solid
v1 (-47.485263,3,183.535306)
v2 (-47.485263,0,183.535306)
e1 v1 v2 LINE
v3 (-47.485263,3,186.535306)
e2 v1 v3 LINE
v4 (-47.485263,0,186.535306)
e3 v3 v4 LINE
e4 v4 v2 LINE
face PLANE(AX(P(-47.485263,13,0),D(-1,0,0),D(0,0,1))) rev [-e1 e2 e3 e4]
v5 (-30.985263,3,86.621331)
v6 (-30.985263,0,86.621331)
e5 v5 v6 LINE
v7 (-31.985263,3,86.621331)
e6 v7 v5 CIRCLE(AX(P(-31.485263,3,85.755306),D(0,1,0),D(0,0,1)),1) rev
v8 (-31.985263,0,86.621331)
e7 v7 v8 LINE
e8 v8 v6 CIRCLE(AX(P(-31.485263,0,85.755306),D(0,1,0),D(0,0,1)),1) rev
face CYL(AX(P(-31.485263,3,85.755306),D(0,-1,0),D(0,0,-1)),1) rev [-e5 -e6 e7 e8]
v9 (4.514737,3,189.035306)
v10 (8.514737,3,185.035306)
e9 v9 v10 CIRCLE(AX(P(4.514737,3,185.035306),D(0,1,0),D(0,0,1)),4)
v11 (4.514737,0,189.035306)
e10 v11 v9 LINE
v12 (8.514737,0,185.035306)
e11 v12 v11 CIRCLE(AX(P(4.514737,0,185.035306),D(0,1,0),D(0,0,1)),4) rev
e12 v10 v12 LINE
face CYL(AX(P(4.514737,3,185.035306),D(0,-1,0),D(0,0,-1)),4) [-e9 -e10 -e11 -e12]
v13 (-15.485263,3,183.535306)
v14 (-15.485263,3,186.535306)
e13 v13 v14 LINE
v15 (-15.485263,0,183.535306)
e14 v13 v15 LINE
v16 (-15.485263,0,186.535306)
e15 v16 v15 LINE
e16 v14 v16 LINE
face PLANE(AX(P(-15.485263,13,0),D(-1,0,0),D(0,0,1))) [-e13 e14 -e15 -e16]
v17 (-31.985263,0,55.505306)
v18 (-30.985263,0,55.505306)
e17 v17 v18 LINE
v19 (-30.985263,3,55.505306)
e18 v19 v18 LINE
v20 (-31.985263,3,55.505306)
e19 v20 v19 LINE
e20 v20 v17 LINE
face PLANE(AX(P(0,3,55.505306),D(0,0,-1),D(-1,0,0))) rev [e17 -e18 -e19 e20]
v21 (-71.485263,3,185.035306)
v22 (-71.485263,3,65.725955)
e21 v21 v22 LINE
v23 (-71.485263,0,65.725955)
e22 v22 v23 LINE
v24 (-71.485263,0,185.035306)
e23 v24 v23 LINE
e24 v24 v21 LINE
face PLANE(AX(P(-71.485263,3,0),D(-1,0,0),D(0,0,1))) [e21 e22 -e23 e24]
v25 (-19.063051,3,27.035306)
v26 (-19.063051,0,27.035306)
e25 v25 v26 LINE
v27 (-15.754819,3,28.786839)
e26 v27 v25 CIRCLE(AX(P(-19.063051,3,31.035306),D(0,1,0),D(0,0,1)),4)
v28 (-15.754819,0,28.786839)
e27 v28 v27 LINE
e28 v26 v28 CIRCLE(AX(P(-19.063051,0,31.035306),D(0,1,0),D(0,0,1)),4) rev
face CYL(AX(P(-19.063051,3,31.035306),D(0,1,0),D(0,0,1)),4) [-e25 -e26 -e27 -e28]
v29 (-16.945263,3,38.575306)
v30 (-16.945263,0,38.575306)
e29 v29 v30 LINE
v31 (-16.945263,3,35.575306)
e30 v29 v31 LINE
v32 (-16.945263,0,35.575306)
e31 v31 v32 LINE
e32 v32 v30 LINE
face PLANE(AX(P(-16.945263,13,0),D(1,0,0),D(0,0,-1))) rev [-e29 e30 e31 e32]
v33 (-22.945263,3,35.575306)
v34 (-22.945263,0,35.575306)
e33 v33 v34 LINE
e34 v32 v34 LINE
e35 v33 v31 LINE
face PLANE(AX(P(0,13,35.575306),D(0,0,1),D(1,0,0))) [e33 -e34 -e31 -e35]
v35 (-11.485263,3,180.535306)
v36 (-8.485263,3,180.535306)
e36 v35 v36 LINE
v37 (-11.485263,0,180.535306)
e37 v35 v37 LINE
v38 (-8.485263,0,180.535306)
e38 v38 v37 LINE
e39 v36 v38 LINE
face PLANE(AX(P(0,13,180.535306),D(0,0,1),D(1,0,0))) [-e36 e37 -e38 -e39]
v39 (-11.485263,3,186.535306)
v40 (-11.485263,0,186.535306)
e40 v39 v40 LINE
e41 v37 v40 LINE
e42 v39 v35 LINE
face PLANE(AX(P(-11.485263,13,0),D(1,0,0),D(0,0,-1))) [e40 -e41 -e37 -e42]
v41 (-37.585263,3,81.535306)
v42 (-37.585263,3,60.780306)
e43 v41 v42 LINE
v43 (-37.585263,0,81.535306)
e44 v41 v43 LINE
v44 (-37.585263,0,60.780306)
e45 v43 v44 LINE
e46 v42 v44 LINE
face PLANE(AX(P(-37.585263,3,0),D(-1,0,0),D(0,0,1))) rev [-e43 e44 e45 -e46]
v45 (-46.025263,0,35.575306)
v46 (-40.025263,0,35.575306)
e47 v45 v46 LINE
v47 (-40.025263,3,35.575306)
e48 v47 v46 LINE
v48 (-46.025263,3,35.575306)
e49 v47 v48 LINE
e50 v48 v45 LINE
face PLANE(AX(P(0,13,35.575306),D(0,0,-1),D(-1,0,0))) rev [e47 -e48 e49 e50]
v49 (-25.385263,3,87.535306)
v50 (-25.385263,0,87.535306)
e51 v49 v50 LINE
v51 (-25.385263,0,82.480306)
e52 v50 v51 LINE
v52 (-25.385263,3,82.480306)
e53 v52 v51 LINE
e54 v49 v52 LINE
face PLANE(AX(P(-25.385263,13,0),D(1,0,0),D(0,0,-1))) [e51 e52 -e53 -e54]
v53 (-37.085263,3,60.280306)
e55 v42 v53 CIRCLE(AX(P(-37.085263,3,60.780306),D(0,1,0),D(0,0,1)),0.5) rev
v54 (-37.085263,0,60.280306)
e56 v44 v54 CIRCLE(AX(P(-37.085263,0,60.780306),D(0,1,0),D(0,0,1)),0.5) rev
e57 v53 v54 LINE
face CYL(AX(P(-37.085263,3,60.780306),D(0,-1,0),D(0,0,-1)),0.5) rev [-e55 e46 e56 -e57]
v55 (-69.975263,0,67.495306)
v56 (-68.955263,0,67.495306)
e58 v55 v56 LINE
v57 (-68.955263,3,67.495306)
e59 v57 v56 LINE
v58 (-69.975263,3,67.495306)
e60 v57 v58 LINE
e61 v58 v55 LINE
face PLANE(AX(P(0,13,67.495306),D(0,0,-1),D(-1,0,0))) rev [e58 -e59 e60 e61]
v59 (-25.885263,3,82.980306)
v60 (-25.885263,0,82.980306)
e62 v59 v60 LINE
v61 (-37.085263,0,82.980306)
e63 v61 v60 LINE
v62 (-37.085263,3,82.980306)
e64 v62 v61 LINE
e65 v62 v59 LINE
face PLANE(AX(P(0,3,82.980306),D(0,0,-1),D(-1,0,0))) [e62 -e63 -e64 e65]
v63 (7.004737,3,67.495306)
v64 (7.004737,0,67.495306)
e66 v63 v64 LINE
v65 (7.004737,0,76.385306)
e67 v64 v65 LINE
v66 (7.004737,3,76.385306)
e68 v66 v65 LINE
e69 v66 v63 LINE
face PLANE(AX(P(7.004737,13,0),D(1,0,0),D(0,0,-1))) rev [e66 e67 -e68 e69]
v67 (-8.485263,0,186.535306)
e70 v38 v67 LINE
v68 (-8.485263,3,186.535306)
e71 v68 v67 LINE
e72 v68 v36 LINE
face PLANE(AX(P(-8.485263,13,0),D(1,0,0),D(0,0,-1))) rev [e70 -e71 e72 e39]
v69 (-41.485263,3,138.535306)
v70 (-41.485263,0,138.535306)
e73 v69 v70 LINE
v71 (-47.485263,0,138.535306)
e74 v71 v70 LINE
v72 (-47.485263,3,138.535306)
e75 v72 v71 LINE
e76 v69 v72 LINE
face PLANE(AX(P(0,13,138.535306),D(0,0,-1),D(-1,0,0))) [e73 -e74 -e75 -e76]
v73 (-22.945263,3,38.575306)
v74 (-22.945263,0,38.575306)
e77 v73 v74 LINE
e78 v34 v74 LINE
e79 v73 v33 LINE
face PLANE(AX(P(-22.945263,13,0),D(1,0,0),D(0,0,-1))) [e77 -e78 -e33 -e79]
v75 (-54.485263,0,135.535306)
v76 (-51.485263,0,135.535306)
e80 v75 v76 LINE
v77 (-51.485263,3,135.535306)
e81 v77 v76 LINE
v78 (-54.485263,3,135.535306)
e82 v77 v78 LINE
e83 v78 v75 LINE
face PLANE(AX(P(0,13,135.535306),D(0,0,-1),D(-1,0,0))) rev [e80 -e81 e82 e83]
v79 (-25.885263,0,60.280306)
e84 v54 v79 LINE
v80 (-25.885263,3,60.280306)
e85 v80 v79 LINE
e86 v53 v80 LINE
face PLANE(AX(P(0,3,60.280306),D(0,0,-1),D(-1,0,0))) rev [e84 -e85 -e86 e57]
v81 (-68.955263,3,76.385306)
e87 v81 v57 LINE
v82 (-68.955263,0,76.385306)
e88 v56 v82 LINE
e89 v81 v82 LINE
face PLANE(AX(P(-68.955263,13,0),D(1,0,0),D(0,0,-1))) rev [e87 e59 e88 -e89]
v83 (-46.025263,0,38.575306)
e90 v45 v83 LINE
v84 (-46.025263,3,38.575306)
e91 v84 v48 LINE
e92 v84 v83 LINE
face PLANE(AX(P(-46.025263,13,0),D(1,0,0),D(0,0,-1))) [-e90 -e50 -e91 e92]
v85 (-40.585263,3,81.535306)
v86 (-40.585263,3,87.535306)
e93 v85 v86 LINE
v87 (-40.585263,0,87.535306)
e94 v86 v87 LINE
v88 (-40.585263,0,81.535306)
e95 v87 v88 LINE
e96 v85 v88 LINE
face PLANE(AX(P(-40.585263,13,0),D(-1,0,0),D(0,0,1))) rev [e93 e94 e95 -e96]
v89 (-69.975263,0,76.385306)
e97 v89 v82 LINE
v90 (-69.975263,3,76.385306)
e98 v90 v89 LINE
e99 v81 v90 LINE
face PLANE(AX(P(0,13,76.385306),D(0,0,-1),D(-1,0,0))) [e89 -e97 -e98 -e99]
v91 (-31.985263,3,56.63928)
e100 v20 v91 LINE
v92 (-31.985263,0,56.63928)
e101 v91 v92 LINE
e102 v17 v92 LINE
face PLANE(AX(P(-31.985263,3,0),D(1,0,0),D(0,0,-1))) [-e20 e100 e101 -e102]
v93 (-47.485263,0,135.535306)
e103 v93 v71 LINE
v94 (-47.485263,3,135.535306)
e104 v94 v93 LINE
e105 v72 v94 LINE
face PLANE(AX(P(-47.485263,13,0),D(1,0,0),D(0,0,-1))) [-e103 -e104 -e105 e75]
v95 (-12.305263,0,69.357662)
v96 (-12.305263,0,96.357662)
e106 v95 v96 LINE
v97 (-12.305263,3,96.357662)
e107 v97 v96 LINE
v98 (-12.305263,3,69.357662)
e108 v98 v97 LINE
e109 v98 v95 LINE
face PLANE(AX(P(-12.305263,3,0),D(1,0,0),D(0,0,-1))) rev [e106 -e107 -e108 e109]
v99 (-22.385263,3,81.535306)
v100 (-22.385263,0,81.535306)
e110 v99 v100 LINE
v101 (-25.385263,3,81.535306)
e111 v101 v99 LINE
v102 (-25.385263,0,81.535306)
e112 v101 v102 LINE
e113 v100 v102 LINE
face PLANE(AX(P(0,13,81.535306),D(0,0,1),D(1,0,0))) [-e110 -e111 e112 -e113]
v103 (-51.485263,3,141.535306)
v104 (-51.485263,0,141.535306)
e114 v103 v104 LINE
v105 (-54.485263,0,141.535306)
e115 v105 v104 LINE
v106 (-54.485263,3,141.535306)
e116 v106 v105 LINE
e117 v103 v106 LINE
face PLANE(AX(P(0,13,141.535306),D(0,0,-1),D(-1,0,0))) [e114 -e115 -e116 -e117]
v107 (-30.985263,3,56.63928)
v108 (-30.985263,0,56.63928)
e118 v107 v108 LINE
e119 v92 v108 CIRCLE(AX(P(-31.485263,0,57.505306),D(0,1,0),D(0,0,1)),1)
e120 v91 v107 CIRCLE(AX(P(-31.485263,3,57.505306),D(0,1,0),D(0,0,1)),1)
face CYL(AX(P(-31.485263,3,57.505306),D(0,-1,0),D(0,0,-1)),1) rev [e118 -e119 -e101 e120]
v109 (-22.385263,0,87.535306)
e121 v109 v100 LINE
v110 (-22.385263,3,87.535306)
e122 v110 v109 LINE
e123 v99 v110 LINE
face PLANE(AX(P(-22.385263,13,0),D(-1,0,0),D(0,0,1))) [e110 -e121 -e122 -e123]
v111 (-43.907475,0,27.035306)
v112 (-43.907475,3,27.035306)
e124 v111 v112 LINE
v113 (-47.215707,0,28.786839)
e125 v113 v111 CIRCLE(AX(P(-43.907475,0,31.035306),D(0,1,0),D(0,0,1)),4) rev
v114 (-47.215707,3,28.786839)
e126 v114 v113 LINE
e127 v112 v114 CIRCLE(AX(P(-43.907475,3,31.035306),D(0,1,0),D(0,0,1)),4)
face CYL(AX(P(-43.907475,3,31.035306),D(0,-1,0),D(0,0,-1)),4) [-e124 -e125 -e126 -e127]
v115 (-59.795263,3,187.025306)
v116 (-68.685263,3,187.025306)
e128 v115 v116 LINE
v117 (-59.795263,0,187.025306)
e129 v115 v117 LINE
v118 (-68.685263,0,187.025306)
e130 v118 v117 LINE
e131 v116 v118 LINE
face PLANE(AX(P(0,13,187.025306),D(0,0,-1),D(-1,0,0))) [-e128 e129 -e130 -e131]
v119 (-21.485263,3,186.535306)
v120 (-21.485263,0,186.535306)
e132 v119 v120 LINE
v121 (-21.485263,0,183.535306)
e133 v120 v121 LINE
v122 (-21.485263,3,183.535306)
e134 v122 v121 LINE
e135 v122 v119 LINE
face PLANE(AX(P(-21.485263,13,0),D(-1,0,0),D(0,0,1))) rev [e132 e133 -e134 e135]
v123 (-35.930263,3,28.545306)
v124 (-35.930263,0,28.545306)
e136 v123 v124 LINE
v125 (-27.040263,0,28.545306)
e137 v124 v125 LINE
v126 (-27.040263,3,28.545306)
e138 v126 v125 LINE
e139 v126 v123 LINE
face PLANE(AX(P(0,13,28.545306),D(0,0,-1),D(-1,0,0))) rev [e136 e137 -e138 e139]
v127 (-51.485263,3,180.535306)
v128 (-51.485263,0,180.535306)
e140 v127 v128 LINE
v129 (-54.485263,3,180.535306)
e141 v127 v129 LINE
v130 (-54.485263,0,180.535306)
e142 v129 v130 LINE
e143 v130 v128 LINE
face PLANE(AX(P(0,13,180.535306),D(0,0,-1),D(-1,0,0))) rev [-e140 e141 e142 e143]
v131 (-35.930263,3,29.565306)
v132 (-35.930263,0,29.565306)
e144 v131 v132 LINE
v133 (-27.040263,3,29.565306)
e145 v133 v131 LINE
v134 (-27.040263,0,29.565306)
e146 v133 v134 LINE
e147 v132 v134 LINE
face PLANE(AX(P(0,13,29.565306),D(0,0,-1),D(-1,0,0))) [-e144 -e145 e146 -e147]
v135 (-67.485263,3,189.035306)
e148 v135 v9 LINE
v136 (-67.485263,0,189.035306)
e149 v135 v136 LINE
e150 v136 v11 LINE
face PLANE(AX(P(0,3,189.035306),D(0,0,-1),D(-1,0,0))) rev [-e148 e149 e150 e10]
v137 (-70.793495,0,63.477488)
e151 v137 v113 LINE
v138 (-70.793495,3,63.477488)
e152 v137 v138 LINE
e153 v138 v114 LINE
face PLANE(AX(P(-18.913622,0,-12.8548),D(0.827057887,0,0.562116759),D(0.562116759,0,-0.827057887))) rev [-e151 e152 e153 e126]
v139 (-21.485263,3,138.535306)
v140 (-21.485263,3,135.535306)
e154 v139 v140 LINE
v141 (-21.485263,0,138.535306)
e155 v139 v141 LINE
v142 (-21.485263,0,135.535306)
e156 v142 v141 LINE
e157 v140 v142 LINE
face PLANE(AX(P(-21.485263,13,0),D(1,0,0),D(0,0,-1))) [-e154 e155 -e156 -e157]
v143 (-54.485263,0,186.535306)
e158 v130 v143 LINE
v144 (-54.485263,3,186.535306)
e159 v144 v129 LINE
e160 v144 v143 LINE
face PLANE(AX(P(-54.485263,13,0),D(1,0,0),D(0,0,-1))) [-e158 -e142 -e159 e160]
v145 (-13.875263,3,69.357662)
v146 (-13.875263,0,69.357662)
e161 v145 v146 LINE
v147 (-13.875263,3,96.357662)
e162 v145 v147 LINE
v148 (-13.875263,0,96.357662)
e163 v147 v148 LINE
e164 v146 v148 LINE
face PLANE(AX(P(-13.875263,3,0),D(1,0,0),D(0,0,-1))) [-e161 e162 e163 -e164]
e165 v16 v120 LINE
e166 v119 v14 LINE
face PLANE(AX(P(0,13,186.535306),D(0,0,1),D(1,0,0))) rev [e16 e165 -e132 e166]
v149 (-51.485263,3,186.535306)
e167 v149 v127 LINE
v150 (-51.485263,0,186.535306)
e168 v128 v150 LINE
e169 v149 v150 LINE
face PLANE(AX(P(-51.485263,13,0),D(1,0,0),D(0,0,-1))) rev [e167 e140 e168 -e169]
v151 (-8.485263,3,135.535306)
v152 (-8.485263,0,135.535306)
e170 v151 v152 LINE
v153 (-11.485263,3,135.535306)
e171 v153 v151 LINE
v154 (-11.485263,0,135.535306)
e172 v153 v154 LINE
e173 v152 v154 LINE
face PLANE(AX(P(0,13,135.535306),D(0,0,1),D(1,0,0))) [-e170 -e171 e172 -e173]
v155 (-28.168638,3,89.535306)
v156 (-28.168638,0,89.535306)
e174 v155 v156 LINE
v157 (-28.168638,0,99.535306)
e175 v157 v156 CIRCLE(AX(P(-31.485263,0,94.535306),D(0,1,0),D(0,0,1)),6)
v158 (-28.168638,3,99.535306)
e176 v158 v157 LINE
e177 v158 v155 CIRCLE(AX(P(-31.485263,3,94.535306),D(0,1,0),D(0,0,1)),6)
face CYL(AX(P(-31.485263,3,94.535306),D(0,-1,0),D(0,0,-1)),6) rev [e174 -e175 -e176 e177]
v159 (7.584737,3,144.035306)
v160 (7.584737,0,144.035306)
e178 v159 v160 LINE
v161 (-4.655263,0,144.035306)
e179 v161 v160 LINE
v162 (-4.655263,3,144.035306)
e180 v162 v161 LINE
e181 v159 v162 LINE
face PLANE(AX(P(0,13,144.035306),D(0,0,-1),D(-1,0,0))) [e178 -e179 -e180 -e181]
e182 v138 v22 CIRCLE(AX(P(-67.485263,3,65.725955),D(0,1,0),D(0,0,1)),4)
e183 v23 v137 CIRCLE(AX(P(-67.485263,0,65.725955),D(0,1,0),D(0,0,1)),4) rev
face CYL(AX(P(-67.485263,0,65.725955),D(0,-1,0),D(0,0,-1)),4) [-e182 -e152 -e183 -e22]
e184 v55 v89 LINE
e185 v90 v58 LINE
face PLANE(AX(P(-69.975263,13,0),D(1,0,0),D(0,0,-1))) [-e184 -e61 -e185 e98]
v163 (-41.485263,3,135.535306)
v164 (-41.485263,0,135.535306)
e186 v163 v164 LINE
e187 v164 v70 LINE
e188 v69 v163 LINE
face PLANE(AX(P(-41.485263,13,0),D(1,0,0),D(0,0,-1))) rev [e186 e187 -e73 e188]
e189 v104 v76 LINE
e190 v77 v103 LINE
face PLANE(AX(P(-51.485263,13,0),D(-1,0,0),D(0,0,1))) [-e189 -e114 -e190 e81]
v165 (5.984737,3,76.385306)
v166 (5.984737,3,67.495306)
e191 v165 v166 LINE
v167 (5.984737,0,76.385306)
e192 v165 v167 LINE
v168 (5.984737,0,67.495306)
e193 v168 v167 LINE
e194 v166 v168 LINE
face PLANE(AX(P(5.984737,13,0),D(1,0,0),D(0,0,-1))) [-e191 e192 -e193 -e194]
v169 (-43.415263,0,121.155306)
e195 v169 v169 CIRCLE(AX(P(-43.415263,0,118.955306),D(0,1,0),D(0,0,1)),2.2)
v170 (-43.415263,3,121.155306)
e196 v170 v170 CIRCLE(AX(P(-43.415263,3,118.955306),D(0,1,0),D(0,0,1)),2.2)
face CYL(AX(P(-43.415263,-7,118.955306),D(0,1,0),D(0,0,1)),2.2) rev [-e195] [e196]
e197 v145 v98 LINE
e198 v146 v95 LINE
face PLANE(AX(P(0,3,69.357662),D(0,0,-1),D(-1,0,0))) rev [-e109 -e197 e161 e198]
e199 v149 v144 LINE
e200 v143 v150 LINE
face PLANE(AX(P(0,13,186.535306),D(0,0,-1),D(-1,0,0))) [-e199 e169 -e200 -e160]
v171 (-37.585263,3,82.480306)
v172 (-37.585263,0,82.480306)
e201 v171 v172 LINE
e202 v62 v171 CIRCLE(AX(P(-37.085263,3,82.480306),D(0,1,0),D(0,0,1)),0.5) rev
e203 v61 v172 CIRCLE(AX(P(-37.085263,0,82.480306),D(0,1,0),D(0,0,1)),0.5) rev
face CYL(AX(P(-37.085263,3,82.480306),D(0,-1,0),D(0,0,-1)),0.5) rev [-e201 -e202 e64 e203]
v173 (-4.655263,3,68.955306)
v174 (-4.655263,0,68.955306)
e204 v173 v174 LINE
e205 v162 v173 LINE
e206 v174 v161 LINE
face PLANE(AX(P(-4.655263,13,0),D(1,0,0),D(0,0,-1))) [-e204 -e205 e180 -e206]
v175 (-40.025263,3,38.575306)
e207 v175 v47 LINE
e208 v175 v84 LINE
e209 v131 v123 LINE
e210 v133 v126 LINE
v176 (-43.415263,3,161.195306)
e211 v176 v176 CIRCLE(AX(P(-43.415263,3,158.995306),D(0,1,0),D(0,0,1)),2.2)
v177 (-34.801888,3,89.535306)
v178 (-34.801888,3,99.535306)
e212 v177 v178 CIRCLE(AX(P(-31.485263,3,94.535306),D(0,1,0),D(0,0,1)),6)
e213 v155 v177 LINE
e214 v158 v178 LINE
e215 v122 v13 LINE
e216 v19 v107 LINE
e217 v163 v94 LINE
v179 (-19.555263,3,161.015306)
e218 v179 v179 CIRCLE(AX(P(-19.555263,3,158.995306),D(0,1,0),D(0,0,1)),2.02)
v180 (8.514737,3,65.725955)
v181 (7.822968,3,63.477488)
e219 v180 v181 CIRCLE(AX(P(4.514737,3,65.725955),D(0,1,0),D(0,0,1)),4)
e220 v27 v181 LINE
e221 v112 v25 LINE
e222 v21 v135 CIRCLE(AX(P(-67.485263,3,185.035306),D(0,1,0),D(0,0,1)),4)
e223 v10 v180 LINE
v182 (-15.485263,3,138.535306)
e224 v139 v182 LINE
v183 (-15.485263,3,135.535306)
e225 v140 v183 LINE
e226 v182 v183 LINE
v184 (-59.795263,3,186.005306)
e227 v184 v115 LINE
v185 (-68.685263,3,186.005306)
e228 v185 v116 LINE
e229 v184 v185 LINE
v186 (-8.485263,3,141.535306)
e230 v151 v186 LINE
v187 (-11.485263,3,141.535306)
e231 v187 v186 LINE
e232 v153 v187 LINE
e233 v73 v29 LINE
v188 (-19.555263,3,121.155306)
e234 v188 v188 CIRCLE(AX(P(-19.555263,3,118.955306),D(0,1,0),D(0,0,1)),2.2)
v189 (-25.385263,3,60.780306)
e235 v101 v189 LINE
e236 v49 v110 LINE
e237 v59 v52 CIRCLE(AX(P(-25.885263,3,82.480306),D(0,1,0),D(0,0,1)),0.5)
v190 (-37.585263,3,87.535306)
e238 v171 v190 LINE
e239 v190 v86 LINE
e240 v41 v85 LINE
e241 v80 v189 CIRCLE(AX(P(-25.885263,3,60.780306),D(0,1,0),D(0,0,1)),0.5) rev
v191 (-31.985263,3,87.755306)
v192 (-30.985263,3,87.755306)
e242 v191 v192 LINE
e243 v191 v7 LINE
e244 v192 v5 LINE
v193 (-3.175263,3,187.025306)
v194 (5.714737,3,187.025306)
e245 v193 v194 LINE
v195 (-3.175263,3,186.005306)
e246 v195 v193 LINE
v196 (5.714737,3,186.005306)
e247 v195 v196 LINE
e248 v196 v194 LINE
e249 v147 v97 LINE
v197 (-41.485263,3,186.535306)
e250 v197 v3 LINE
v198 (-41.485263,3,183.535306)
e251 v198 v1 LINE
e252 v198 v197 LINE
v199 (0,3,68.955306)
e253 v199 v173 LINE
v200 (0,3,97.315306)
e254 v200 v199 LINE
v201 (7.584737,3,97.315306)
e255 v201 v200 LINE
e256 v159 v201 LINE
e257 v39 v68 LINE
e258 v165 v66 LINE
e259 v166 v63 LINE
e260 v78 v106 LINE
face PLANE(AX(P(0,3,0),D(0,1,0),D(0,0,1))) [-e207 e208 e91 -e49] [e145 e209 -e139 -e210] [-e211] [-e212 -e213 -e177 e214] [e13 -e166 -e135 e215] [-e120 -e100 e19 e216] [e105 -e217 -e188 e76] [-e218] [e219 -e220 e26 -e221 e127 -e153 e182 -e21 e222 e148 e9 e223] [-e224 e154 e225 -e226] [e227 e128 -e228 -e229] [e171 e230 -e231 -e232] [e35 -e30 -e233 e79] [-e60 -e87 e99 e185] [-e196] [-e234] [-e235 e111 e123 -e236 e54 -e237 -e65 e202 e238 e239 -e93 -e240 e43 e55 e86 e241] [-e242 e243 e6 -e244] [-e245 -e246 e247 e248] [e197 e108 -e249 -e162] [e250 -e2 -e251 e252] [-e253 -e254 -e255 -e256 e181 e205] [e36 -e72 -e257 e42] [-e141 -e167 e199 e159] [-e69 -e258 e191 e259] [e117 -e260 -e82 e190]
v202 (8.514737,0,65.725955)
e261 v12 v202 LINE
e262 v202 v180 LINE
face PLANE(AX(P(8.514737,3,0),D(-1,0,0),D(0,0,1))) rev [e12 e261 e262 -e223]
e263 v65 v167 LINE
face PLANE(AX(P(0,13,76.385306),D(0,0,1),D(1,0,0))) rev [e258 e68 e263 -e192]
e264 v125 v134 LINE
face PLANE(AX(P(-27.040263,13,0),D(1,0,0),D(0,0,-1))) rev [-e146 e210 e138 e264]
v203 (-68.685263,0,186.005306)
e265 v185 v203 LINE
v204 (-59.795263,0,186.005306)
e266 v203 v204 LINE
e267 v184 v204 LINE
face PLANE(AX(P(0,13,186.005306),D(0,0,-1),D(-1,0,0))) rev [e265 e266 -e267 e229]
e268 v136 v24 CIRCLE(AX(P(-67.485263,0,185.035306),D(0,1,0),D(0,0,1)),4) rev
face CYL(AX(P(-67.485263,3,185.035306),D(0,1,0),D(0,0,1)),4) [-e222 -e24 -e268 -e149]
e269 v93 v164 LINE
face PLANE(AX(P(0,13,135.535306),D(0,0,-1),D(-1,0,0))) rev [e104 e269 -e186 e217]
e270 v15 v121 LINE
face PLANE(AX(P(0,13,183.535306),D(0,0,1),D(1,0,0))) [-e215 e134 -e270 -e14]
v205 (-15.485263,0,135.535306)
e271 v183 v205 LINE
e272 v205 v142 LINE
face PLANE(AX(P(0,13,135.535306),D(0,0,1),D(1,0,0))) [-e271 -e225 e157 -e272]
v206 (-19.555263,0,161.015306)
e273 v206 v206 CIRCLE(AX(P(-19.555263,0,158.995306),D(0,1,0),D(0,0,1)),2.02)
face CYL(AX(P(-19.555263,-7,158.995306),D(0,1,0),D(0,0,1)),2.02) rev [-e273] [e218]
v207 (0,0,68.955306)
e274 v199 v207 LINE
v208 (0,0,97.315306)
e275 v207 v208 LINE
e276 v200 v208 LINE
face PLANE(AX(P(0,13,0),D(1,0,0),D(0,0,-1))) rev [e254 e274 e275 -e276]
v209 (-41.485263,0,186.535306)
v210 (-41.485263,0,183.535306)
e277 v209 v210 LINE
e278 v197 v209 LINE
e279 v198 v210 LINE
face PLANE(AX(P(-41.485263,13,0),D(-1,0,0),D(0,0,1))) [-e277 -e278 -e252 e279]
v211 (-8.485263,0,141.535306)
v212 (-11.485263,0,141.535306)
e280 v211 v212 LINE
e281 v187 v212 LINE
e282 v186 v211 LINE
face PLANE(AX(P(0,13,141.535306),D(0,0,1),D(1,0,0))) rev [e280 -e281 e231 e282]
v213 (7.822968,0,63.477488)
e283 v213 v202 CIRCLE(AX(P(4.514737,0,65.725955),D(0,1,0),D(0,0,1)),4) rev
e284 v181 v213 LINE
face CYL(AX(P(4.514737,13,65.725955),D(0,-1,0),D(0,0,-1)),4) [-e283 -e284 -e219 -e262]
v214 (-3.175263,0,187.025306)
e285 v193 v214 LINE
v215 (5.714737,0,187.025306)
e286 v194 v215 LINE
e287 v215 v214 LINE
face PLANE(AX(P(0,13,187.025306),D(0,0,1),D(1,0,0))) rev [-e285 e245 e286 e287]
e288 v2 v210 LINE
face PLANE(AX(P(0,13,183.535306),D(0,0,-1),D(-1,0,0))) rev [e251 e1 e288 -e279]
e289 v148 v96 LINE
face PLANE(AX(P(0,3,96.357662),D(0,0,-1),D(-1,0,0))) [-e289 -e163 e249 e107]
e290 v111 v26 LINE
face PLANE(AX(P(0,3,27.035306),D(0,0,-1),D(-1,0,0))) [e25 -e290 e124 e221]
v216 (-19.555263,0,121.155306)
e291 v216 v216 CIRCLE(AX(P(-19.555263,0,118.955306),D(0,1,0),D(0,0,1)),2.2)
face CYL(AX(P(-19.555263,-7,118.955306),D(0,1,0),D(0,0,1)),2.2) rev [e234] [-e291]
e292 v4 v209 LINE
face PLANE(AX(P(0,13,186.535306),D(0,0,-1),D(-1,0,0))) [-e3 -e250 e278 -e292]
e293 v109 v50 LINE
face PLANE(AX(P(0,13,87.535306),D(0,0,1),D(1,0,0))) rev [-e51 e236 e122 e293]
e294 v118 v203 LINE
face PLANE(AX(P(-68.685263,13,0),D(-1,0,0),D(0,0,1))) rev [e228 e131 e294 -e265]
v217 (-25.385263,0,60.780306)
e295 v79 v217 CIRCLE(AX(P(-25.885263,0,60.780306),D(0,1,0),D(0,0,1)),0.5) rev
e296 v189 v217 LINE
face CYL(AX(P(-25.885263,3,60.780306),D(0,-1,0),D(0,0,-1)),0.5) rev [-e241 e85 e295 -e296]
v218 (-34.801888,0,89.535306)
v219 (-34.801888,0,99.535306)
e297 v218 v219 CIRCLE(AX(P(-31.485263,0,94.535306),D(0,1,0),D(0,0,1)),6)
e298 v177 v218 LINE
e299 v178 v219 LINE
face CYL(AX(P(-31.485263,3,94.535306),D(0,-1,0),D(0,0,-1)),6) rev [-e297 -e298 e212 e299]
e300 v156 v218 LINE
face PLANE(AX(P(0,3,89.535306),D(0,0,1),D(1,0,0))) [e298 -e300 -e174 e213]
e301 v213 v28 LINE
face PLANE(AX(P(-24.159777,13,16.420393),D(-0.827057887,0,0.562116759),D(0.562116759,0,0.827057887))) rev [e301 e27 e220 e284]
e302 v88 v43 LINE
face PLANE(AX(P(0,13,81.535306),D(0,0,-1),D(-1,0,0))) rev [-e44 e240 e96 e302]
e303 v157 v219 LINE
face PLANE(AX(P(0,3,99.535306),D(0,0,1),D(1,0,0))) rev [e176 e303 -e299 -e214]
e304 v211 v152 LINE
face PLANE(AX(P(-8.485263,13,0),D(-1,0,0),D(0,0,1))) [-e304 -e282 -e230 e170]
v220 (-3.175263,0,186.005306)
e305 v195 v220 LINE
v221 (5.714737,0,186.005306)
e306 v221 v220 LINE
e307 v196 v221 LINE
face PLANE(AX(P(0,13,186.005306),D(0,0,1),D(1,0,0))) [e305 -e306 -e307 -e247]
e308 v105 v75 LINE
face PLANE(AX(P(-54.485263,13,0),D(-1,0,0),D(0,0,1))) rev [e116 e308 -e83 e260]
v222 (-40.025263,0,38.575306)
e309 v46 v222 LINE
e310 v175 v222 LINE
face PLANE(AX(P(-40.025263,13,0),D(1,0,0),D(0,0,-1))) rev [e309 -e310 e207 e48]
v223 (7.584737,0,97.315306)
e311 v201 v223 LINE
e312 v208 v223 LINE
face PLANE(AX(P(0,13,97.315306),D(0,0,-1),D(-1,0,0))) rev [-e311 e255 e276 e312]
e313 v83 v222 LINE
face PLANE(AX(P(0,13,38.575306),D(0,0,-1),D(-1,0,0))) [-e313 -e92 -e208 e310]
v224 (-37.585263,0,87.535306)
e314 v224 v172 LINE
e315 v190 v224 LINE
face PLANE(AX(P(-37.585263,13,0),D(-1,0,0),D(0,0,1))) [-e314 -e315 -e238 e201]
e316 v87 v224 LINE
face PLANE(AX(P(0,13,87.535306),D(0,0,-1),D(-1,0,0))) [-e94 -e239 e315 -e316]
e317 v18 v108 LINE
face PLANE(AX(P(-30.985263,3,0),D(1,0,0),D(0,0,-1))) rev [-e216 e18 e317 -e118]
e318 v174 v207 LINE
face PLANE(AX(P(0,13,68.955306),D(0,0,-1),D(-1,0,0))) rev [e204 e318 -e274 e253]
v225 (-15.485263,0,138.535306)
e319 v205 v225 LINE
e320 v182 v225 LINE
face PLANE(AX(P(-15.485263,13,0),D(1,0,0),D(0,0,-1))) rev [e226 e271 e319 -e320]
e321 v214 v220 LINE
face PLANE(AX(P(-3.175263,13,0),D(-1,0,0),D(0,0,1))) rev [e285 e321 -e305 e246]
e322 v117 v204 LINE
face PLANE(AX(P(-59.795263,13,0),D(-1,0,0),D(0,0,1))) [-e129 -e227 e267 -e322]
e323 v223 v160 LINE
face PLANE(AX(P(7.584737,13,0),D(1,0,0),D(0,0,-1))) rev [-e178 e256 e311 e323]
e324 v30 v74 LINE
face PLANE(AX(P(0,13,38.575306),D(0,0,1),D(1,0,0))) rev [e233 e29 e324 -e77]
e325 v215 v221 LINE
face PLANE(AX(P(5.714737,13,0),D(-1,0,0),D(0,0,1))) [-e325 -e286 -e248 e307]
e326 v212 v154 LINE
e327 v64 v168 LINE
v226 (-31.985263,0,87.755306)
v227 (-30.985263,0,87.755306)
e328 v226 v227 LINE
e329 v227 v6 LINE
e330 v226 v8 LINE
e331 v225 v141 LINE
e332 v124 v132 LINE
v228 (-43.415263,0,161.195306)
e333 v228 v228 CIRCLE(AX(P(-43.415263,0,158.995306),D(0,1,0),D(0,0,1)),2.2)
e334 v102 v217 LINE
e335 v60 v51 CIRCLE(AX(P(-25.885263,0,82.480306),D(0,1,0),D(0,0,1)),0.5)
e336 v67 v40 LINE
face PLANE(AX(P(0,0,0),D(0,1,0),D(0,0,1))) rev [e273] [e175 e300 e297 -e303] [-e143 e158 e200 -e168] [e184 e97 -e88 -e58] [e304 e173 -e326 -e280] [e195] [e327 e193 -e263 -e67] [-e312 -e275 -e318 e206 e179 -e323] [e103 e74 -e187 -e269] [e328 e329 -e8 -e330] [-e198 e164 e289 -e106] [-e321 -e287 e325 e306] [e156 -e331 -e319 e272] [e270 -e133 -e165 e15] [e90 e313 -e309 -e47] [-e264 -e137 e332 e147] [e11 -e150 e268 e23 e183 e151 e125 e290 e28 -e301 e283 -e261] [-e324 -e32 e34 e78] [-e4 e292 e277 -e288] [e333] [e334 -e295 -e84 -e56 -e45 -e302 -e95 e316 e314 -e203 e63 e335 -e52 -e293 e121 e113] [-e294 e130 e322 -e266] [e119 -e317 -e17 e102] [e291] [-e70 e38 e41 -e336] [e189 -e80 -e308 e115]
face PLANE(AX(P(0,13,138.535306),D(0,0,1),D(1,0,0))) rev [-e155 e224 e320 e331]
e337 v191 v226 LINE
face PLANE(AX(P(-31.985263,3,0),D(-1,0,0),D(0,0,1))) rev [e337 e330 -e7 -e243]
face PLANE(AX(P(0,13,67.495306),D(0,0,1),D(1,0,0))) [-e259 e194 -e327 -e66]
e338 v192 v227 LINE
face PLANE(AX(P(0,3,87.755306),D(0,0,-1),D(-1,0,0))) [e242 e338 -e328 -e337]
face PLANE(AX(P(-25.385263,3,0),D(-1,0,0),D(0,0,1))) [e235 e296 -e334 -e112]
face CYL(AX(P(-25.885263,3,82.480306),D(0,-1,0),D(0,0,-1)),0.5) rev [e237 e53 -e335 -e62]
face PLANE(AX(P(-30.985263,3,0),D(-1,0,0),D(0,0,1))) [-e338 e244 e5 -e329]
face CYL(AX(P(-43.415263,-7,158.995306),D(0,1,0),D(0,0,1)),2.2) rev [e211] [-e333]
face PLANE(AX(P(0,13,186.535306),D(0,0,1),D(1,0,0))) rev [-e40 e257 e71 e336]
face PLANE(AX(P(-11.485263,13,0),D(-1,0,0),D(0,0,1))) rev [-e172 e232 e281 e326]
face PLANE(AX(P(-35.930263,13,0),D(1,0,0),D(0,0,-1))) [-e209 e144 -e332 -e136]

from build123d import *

# Parameters (mm, degrees)
BOSS_EXTRUDE5_OUTLINE_W   = 80
BOSS_EXTRUDE5_OUTLINE_H   = 162
BOSS_EXTRUDE5_OUTLINE_W_2 = 1.57
BOSS_EXTRUDE5_OUTLINE_H_2 = 27
BOSS_EXTRUDE5_DEPTH       = 3
SKETCH8_R                 = 2.2
SKETCH8_R_2               = 2.02
CUT_EXTRUDE1_DEPTH        = 10
CUT_EXTRUDE2_DEPTH        = 10
CUT_EXTRUDE2_DEPTH_BACK   = 3
SKETCH9_W                 = 3
SKETCH9_H                 = 6
SKETCH9_W_2               = 6
SKETCH9_H_2               = 3
SKETCH9_W_3               = 1.02
SKETCH9_H_3               = 8.89
SKETCH9_W_4               = 8.89
SKETCH9_H_4               = 1.02
SKETCH9_W_5               = 4.655263111
SKETCH9_H_5               = 28.36
FILLET3_R                 = 4


# Read off the part's stored shape, not the designer's step: Boss-Extrude5
with BuildPart() as part:
    # Boss-Extrude5 outline → Boss-Extrude5 (new body)
    with BuildSketch(Plane(origin=(0, 0, 0), x_dir=(1, 0, 0), z_dir=(0, 1, 0))):
        with Locations((-31.485263111, -108.03530565)):
            Rectangle(BOSS_EXTRUDE5_OUTLINE_W, BOSS_EXTRUDE5_OUTLINE_H)
        with BuildLine():
            Line((-34.801887901, -89.53530565), (-28.16863832, -89.53530565))
            ThreePointArc((-28.16863832, -89.53530565), (-25.485263111, -94.53530565), (-28.16863832, -99.53530565))
            Line((-28.16863832, -99.53530565), (-34.801887901, -99.53530565))
            ThreePointArc((-34.801887901, -99.53530565), (-37.485263111, -94.53530565), (-34.801887901, -89.53530565))
        make_face(mode=Mode.SUBTRACT)
        with BuildLine():
            Line((-30.985263111, -86.621331054), (-30.985263111, -87.75530565))
            Line((-30.985263111, -87.75530565), (-31.985263111, -87.75530565))
            Line((-31.985263111, -87.75530565), (-31.985263111, -86.621331054))
            ThreePointArc((-31.985263111, -86.621331054), (-31.485263111, -84.75530565), (-30.985263111, -86.621331054))
        make_face(mode=Mode.SUBTRACT)
        with BuildLine():
            Line((-25.885263111, -82.98030565), (-37.085263111, -82.98030565))
            ThreePointArc((-37.085263111, -82.98030565), (-37.438816501, -82.833859041), (-37.585263111, -82.48030565))
            Line((-37.585263111, -82.48030565), (-37.585263111, -60.78030565))
            ThreePointArc((-37.585263111, -60.78030565), (-37.438816502, -60.42675226), (-37.085263111, -60.28030565))
            Line((-37.085263111, -60.28030565), (-25.885263111, -60.28030565))
            ThreePointArc((-25.885263111, -60.28030565), (-25.53170972, -60.426752259), (-25.385263111, -60.78030565))
            Line((-25.385263111, -60.78030565), (-25.385263111, -82.48030565))
            ThreePointArc((-25.385263111, -82.48030565), (-25.53170972, -82.833859041), (-25.885263111, -82.98030565))
        make_face(mode=Mode.SUBTRACT)
        with Locations((-13.090263111, -82.857662255)):
            Rectangle(BOSS_EXTRUDE5_OUTLINE_W_2, BOSS_EXTRUDE5_OUTLINE_H_2, mode=Mode.SUBTRACT)
        with BuildLine():
            ThreePointArc((-30.985263111, -56.639280246), (-31.485263111, -58.50530565), (-31.985263111, -56.639280246))
            Line((-31.985263111, -56.639280246), (-31.985263111, -55.50530565))
            Line((-31.985263111, -55.50530565), (-30.985263111, -55.50530565))
            Line((-30.985263111, -55.50530565), (-30.985263111, -56.639280246))
        make_face(mode=Mode.SUBTRACT)
    extrude(amount=BOSS_EXTRUDE5_DEPTH)

    # Sketch8 → Cut-Extrude1 (cut)
    with BuildSketch(Plane(origin=(0, 3, 0), x_dir=(1, 0, 0), z_dir=(0, 1, 0))):
        with Locations(Location((-43.415263111, -118.95530565, 0), (0, 0, 270))):
            Circle(SKETCH8_R)
        with Locations(Location((-19.555263111, -118.95530565, 0), (0, 0, 270))):
            Circle(SKETCH8_R)
        with Locations(Location((-19.555263111, -158.99530565, 0), (0, 0, 270))):
            Circle(SKETCH8_R_2)
        with Locations(Location((-43.415263111, -158.99530565, 0), (0, 0, 270))):
            Circle(SKETCH8_R)
    extrude(amount=-CUT_EXTRUDE1_DEPTH, mode=Mode.SUBTRACT)

    # Sketch9 → Cut-Extrude2 (cut, two sides: drawn at the far end of the back side and taken through both)
    with BuildSketch(Plane(origin=(0, 3, 0), x_dir=(1, 0, 0), z_dir=(0, 1, 0)).offset(-CUT_EXTRUDE2_DEPTH_BACK)):
        with Locations((-52.985263111, -183.53530565)):
            Rectangle(SKETCH9_W, SKETCH9_H)
        with Locations((-9.985263111, -183.53530565)):
            Rectangle(SKETCH9_W, SKETCH9_H)
        with Locations((-9.985263111, -138.53530565)):
            Rectangle(SKETCH9_W, SKETCH9_H)
        with Locations((-52.985263111, -138.53530565)):
            Rectangle(SKETCH9_W, SKETCH9_H)
        Polygon((-37.585263111, -81.53530565), (-40.585263111, -81.53530565), (-40.585263111, -87.53530565), (-37.585263111, -87.53530565), (-37.585263111, -82.48030565), align=None)
        Polygon((-25.385263111, -87.53530565), (-22.385263111, -87.53530565), (-22.385263111, -81.53530565), (-25.385263111, -81.53530565), (-25.385263111, -82.48030565), align=None)
        with Locations((-44.485263111, -185.03530565)):
            Rectangle(SKETCH9_W_2, SKETCH9_H_2)
        with Locations((-18.485263111, -185.03530565)):
            Rectangle(SKETCH9_W_2, SKETCH9_H_2)
        with Locations((-44.485263111, -137.03530565)):
            Rectangle(SKETCH9_W_2, SKETCH9_H_2)
        with Locations((-18.485263111, -137.03530565)):
            Rectangle(SKETCH9_W_2, SKETCH9_H_2)
        with Locations((-69.465263111, -71.94030565)):
            Rectangle(SKETCH9_W_3, SKETCH9_H_3)
        with Locations((-31.485263111, -29.05530565)):
            Rectangle(SKETCH9_W_4, SKETCH9_H_4)
        with Locations((6.494736889, -71.94030565)):
            Rectangle(SKETCH9_W_3, SKETCH9_H_3)
        with Locations((-64.240263111, -186.51530565)):
            Rectangle(SKETCH9_W_4, SKETCH9_H_4)
        with Locations((1.269736889, -186.51530565)):
            Rectangle(SKETCH9_W_4, SKETCH9_H_4)
        Polygon((0, -97.31530565), (-4.655263111, -97.31530565), (-4.655263111, -144.03530565), (7.584736889, -144.03530565), (7.584736889, -97.31530565), align=None)
        with Locations((-2.327631556, -83.13530565)):
            Rectangle(SKETCH9_W_5, SKETCH9_H_5)
        with Locations((-43.025263111, -37.07530565)):
            Rectangle(SKETCH9_W_2, SKETCH9_H_2)
        with Locations((-19.945263111, -37.07530565)):
            Rectangle(SKETCH9_W_2, SKETCH9_H_2)
        Polygon((-16.945263111, -27.03530565), (8.514736889, -64.49530565), (8.514736889, -27.03530565), align=None)
        Polygon((-71.485263111, -27.03530565), (-71.485263111, -64.49530565), (-46.025263111, -27.03530565), align=None)
    extrude(amount=CUT_EXTRUDE2_DEPTH + CUT_EXTRUDE2_DEPTH_BACK, mode=Mode.SUBTRACT)

    # Fillet3
    fillet3_edges = [part.edges().sort_by_distance(p)[0] for p in [
        (-16.945263111, 1.5, 27.03530565),
        (8.514736889, 1.5, 64.49530565),
        (-71.485263111, 1.5, 64.49530565),
        (-46.025263111, 1.5, 27.03530565),
        (-71.485263111, 1.5, 189.03530565),
        (8.514736889, 1.5, 189.03530565),
    ]]
    fillet(fillet3_edges, radius=FILLET3_R)


solid = part.part
